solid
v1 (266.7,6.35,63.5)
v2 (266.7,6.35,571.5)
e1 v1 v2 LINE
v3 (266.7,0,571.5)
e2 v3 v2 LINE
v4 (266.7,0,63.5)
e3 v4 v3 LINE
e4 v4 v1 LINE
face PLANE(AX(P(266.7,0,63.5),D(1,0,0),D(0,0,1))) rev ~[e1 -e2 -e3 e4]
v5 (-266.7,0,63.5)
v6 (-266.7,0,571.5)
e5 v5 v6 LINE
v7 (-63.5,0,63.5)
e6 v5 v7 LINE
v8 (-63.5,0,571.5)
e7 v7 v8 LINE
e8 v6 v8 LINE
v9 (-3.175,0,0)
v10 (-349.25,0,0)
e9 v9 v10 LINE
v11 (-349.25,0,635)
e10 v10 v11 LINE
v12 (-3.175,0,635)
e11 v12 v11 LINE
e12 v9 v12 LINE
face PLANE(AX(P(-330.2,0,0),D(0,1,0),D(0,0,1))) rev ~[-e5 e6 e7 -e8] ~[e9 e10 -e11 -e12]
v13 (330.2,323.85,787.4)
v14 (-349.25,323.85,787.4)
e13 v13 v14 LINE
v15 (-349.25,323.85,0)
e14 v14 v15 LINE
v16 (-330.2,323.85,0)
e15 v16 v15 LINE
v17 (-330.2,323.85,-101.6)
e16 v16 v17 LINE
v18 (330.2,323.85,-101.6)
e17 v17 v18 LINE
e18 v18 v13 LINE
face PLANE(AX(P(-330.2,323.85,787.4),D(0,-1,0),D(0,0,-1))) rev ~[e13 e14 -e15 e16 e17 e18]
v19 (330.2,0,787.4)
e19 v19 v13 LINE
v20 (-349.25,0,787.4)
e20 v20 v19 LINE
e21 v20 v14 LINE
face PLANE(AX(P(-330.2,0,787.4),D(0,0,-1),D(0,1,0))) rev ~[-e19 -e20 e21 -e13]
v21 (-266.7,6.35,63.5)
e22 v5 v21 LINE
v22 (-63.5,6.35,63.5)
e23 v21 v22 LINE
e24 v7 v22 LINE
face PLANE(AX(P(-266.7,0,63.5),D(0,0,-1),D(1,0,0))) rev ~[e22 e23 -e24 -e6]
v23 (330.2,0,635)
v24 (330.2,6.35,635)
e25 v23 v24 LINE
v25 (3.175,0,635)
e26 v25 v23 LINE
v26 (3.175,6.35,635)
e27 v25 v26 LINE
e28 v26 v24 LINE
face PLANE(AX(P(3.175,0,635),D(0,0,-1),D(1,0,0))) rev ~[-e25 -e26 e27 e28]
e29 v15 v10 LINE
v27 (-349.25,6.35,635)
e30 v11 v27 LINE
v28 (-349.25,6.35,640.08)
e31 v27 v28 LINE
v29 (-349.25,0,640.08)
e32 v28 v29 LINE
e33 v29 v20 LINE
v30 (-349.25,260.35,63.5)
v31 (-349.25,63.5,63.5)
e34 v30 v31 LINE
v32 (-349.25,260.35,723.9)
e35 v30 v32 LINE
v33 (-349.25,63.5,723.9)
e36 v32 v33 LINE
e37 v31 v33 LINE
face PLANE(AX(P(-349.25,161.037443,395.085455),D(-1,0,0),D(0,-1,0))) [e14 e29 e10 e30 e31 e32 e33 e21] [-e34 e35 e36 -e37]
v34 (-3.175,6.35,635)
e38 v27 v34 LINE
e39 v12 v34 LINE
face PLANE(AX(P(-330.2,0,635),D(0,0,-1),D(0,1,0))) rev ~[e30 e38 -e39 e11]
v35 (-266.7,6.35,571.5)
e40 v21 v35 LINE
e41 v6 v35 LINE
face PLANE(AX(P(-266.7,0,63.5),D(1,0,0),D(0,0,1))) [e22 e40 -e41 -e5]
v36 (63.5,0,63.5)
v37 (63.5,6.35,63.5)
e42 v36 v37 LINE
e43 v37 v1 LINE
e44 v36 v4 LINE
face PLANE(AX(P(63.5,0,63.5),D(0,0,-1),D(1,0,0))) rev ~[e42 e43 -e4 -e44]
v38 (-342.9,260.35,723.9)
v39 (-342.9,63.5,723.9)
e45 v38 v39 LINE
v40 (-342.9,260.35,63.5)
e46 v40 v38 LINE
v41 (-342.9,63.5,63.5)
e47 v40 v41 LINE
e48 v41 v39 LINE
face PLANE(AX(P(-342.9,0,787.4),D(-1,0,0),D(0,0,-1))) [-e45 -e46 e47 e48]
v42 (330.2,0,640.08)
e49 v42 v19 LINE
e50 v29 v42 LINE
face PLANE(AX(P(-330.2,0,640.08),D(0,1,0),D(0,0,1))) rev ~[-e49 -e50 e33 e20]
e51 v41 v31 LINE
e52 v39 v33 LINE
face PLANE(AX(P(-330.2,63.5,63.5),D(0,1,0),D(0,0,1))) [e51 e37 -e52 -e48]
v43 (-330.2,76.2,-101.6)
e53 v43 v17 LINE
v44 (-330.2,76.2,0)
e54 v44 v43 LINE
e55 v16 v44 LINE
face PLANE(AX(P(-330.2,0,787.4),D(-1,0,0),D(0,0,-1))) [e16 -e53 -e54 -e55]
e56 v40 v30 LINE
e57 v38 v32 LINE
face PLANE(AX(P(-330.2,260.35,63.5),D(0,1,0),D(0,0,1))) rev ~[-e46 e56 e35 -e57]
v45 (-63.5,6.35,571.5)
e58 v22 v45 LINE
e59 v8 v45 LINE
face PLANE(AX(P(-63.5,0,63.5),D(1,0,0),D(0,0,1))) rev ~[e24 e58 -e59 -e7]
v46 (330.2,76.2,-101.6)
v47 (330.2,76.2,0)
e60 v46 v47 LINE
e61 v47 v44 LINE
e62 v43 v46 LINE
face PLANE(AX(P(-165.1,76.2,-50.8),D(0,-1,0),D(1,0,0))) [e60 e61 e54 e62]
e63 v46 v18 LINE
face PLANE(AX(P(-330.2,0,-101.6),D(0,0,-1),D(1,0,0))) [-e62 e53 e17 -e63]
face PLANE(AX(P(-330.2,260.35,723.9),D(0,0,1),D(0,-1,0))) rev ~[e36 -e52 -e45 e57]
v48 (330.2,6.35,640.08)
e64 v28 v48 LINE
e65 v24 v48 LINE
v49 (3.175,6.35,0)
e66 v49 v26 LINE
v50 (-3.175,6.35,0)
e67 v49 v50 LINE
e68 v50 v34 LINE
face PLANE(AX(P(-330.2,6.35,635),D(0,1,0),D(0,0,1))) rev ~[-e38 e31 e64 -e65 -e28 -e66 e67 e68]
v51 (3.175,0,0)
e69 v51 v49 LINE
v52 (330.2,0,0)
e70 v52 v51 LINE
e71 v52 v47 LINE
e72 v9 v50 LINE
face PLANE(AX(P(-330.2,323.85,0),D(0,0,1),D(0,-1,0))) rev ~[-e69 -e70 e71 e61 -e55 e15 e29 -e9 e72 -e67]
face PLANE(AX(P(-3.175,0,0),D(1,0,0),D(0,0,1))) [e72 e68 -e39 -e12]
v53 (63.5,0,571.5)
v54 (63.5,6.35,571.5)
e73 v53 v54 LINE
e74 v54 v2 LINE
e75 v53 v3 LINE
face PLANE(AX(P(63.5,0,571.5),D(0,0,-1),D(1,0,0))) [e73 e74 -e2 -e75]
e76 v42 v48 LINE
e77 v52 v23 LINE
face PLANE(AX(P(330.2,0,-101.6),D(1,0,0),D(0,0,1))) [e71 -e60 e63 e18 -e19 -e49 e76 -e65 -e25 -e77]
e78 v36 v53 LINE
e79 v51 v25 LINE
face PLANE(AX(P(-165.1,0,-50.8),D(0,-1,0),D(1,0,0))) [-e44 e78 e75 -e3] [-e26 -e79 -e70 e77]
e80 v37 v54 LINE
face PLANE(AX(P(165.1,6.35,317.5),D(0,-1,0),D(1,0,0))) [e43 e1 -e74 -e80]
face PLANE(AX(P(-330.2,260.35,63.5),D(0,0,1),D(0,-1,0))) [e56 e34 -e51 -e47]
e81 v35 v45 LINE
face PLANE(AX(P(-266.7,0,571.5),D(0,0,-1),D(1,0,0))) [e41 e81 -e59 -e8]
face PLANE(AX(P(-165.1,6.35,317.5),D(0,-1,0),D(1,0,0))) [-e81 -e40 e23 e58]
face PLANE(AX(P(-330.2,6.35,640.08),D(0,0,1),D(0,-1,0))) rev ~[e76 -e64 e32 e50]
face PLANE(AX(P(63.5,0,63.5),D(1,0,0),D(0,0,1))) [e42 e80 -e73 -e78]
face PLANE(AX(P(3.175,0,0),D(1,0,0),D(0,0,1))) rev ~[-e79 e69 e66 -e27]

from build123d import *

# Parameters (mm, degrees)
F0_W     = 3.175
F0_H     = 635
F0_W_2   = 327.025
F0_W_3   = 203.2
F0_H_2   = 508
F0_W_4   = 330.2
F0_H_3   = 147.32
F1_DEPTH = 323.85
F2_DEPTH = 6.35
F3_DEPTH = 76.2
F4_W     = 196.85
F4_H     = 660.4
F5_DEPTH = 19.05
F6_DEPTH = 12.7


with BuildPart() as f1:
    # F0 (on Front) → F1 (new body)
    with BuildSketch(Plane.XZ):
        Polygon((0, -101.6), (0, 0), (-3.175, 0), (-330.2, 0), (-330.2, -101.6), align=None)
        with Locations((-1.5875, 317.5)):
            Rectangle(F0_W, F0_H)
        Polygon((3.175, 0), (0, 0), (0, -101.6), (330.2, -101.6), (330.2, 0), align=None)
        with Locations((1.5875, 317.5)):
            Rectangle(F0_W, F0_H)
        with Locations((-166.6875, 317.5)):
            Rectangle(F0_W_2, F0_H)
        with Locations((-165.1, 317.5)):
            Rectangle(F0_W_3, F0_H_2, mode=Mode.SUBTRACT)
        Polygon((-3.175, 635), (0, 635), (0, 640.08), (-330.2, 640.08), (-330.2, 635), align=None)
        Polygon((0, 640.08), (0, 635), (3.175, 635), (330.2, 635), (330.2, 640.08), align=None)
        with Locations((166.6875, 317.5)):
            Rectangle(F0_W_2, F0_H)
        with Locations((165.1, 317.5)):
            Rectangle(F0_W_3, F0_H_2, mode=Mode.SUBTRACT)
        with Locations((-165.1, 713.74)):
            Rectangle(F0_W_4, F0_H_3)
        with Locations((165.1, 713.74)):
            Rectangle(F0_W_4, F0_H_3)
        with Locations((-165.1, 317.5)):
            Rectangle(F0_W_3, F0_H_2)
        with Locations((165.1, 317.5)):
            Rectangle(F0_W_3, F0_H_2)
    extrude(amount=-F1_DEPTH)

    # F0 (on Front) → F2 (cut)
    with BuildSketch(Plane.XZ):
        Polygon((0, -101.6), (0, 0), (-3.175, 0), (-330.2, 0), (-330.2, -101.6), align=None)
        with Locations((-1.5875, 317.5)):
            Rectangle(F0_W, F0_H)
        with Locations((1.5875, 317.5)):
            Rectangle(F0_W, F0_H)
        Polygon((-3.175, 635), (0, 635), (0, 640.08), (-330.2, 640.08), (-330.2, 635), align=None)
        Polygon((0, 640.08), (0, 635), (3.175, 635), (330.2, 635), (330.2, 640.08), align=None)
        with Locations((-165.1, 317.5)):
            Rectangle(F0_W_3, F0_H_2)
        with Locations((165.1, 317.5)):
            Rectangle(F0_W_3, F0_H_2)
    extrude(amount=-F2_DEPTH, mode=Mode.SUBTRACT)

    # F0 (on Front) → F3 (cut)
    with BuildSketch(Plane.XZ):
        Polygon((0, -101.6), (0, 0), (-3.175, 0), (-330.2, 0), (-330.2, -101.6), align=None)
        Polygon((3.175, 0), (0, 0), (0, -101.6), (330.2, -101.6), (330.2, 0), align=None)
    extrude(amount=-F3_DEPTH, mode=Mode.SUBTRACT)

    # F4 (on face) → F5 (join)
    with BuildSketch(Plane(origin=(-330.2, 0, 0), x_dir=(0, -1, 0), z_dir=(-1, 0, 0))):
        Polygon((0, 787.4), (-323.85, 787.4), (-323.85, 0), (-76.2, 0), (0, 0), (0, 635), (-6.35, 635), (-6.35, 640.08), (0, 640.08), align=None)
        with Locations((-161.925, 393.7)):
            Rectangle(F4_W, F4_H, mode=Mode.SUBTRACT)
    extrude(amount=F5_DEPTH)

    # F6 (add): a face of the model
    f6_faces = [f1.faces().sort_by_distance(p)[0] for p in [
        (-330.2, 161.925, 393.7),
    ]]
    extrude(f6_faces, amount=F6_DEPTH)


solid = f1.part
